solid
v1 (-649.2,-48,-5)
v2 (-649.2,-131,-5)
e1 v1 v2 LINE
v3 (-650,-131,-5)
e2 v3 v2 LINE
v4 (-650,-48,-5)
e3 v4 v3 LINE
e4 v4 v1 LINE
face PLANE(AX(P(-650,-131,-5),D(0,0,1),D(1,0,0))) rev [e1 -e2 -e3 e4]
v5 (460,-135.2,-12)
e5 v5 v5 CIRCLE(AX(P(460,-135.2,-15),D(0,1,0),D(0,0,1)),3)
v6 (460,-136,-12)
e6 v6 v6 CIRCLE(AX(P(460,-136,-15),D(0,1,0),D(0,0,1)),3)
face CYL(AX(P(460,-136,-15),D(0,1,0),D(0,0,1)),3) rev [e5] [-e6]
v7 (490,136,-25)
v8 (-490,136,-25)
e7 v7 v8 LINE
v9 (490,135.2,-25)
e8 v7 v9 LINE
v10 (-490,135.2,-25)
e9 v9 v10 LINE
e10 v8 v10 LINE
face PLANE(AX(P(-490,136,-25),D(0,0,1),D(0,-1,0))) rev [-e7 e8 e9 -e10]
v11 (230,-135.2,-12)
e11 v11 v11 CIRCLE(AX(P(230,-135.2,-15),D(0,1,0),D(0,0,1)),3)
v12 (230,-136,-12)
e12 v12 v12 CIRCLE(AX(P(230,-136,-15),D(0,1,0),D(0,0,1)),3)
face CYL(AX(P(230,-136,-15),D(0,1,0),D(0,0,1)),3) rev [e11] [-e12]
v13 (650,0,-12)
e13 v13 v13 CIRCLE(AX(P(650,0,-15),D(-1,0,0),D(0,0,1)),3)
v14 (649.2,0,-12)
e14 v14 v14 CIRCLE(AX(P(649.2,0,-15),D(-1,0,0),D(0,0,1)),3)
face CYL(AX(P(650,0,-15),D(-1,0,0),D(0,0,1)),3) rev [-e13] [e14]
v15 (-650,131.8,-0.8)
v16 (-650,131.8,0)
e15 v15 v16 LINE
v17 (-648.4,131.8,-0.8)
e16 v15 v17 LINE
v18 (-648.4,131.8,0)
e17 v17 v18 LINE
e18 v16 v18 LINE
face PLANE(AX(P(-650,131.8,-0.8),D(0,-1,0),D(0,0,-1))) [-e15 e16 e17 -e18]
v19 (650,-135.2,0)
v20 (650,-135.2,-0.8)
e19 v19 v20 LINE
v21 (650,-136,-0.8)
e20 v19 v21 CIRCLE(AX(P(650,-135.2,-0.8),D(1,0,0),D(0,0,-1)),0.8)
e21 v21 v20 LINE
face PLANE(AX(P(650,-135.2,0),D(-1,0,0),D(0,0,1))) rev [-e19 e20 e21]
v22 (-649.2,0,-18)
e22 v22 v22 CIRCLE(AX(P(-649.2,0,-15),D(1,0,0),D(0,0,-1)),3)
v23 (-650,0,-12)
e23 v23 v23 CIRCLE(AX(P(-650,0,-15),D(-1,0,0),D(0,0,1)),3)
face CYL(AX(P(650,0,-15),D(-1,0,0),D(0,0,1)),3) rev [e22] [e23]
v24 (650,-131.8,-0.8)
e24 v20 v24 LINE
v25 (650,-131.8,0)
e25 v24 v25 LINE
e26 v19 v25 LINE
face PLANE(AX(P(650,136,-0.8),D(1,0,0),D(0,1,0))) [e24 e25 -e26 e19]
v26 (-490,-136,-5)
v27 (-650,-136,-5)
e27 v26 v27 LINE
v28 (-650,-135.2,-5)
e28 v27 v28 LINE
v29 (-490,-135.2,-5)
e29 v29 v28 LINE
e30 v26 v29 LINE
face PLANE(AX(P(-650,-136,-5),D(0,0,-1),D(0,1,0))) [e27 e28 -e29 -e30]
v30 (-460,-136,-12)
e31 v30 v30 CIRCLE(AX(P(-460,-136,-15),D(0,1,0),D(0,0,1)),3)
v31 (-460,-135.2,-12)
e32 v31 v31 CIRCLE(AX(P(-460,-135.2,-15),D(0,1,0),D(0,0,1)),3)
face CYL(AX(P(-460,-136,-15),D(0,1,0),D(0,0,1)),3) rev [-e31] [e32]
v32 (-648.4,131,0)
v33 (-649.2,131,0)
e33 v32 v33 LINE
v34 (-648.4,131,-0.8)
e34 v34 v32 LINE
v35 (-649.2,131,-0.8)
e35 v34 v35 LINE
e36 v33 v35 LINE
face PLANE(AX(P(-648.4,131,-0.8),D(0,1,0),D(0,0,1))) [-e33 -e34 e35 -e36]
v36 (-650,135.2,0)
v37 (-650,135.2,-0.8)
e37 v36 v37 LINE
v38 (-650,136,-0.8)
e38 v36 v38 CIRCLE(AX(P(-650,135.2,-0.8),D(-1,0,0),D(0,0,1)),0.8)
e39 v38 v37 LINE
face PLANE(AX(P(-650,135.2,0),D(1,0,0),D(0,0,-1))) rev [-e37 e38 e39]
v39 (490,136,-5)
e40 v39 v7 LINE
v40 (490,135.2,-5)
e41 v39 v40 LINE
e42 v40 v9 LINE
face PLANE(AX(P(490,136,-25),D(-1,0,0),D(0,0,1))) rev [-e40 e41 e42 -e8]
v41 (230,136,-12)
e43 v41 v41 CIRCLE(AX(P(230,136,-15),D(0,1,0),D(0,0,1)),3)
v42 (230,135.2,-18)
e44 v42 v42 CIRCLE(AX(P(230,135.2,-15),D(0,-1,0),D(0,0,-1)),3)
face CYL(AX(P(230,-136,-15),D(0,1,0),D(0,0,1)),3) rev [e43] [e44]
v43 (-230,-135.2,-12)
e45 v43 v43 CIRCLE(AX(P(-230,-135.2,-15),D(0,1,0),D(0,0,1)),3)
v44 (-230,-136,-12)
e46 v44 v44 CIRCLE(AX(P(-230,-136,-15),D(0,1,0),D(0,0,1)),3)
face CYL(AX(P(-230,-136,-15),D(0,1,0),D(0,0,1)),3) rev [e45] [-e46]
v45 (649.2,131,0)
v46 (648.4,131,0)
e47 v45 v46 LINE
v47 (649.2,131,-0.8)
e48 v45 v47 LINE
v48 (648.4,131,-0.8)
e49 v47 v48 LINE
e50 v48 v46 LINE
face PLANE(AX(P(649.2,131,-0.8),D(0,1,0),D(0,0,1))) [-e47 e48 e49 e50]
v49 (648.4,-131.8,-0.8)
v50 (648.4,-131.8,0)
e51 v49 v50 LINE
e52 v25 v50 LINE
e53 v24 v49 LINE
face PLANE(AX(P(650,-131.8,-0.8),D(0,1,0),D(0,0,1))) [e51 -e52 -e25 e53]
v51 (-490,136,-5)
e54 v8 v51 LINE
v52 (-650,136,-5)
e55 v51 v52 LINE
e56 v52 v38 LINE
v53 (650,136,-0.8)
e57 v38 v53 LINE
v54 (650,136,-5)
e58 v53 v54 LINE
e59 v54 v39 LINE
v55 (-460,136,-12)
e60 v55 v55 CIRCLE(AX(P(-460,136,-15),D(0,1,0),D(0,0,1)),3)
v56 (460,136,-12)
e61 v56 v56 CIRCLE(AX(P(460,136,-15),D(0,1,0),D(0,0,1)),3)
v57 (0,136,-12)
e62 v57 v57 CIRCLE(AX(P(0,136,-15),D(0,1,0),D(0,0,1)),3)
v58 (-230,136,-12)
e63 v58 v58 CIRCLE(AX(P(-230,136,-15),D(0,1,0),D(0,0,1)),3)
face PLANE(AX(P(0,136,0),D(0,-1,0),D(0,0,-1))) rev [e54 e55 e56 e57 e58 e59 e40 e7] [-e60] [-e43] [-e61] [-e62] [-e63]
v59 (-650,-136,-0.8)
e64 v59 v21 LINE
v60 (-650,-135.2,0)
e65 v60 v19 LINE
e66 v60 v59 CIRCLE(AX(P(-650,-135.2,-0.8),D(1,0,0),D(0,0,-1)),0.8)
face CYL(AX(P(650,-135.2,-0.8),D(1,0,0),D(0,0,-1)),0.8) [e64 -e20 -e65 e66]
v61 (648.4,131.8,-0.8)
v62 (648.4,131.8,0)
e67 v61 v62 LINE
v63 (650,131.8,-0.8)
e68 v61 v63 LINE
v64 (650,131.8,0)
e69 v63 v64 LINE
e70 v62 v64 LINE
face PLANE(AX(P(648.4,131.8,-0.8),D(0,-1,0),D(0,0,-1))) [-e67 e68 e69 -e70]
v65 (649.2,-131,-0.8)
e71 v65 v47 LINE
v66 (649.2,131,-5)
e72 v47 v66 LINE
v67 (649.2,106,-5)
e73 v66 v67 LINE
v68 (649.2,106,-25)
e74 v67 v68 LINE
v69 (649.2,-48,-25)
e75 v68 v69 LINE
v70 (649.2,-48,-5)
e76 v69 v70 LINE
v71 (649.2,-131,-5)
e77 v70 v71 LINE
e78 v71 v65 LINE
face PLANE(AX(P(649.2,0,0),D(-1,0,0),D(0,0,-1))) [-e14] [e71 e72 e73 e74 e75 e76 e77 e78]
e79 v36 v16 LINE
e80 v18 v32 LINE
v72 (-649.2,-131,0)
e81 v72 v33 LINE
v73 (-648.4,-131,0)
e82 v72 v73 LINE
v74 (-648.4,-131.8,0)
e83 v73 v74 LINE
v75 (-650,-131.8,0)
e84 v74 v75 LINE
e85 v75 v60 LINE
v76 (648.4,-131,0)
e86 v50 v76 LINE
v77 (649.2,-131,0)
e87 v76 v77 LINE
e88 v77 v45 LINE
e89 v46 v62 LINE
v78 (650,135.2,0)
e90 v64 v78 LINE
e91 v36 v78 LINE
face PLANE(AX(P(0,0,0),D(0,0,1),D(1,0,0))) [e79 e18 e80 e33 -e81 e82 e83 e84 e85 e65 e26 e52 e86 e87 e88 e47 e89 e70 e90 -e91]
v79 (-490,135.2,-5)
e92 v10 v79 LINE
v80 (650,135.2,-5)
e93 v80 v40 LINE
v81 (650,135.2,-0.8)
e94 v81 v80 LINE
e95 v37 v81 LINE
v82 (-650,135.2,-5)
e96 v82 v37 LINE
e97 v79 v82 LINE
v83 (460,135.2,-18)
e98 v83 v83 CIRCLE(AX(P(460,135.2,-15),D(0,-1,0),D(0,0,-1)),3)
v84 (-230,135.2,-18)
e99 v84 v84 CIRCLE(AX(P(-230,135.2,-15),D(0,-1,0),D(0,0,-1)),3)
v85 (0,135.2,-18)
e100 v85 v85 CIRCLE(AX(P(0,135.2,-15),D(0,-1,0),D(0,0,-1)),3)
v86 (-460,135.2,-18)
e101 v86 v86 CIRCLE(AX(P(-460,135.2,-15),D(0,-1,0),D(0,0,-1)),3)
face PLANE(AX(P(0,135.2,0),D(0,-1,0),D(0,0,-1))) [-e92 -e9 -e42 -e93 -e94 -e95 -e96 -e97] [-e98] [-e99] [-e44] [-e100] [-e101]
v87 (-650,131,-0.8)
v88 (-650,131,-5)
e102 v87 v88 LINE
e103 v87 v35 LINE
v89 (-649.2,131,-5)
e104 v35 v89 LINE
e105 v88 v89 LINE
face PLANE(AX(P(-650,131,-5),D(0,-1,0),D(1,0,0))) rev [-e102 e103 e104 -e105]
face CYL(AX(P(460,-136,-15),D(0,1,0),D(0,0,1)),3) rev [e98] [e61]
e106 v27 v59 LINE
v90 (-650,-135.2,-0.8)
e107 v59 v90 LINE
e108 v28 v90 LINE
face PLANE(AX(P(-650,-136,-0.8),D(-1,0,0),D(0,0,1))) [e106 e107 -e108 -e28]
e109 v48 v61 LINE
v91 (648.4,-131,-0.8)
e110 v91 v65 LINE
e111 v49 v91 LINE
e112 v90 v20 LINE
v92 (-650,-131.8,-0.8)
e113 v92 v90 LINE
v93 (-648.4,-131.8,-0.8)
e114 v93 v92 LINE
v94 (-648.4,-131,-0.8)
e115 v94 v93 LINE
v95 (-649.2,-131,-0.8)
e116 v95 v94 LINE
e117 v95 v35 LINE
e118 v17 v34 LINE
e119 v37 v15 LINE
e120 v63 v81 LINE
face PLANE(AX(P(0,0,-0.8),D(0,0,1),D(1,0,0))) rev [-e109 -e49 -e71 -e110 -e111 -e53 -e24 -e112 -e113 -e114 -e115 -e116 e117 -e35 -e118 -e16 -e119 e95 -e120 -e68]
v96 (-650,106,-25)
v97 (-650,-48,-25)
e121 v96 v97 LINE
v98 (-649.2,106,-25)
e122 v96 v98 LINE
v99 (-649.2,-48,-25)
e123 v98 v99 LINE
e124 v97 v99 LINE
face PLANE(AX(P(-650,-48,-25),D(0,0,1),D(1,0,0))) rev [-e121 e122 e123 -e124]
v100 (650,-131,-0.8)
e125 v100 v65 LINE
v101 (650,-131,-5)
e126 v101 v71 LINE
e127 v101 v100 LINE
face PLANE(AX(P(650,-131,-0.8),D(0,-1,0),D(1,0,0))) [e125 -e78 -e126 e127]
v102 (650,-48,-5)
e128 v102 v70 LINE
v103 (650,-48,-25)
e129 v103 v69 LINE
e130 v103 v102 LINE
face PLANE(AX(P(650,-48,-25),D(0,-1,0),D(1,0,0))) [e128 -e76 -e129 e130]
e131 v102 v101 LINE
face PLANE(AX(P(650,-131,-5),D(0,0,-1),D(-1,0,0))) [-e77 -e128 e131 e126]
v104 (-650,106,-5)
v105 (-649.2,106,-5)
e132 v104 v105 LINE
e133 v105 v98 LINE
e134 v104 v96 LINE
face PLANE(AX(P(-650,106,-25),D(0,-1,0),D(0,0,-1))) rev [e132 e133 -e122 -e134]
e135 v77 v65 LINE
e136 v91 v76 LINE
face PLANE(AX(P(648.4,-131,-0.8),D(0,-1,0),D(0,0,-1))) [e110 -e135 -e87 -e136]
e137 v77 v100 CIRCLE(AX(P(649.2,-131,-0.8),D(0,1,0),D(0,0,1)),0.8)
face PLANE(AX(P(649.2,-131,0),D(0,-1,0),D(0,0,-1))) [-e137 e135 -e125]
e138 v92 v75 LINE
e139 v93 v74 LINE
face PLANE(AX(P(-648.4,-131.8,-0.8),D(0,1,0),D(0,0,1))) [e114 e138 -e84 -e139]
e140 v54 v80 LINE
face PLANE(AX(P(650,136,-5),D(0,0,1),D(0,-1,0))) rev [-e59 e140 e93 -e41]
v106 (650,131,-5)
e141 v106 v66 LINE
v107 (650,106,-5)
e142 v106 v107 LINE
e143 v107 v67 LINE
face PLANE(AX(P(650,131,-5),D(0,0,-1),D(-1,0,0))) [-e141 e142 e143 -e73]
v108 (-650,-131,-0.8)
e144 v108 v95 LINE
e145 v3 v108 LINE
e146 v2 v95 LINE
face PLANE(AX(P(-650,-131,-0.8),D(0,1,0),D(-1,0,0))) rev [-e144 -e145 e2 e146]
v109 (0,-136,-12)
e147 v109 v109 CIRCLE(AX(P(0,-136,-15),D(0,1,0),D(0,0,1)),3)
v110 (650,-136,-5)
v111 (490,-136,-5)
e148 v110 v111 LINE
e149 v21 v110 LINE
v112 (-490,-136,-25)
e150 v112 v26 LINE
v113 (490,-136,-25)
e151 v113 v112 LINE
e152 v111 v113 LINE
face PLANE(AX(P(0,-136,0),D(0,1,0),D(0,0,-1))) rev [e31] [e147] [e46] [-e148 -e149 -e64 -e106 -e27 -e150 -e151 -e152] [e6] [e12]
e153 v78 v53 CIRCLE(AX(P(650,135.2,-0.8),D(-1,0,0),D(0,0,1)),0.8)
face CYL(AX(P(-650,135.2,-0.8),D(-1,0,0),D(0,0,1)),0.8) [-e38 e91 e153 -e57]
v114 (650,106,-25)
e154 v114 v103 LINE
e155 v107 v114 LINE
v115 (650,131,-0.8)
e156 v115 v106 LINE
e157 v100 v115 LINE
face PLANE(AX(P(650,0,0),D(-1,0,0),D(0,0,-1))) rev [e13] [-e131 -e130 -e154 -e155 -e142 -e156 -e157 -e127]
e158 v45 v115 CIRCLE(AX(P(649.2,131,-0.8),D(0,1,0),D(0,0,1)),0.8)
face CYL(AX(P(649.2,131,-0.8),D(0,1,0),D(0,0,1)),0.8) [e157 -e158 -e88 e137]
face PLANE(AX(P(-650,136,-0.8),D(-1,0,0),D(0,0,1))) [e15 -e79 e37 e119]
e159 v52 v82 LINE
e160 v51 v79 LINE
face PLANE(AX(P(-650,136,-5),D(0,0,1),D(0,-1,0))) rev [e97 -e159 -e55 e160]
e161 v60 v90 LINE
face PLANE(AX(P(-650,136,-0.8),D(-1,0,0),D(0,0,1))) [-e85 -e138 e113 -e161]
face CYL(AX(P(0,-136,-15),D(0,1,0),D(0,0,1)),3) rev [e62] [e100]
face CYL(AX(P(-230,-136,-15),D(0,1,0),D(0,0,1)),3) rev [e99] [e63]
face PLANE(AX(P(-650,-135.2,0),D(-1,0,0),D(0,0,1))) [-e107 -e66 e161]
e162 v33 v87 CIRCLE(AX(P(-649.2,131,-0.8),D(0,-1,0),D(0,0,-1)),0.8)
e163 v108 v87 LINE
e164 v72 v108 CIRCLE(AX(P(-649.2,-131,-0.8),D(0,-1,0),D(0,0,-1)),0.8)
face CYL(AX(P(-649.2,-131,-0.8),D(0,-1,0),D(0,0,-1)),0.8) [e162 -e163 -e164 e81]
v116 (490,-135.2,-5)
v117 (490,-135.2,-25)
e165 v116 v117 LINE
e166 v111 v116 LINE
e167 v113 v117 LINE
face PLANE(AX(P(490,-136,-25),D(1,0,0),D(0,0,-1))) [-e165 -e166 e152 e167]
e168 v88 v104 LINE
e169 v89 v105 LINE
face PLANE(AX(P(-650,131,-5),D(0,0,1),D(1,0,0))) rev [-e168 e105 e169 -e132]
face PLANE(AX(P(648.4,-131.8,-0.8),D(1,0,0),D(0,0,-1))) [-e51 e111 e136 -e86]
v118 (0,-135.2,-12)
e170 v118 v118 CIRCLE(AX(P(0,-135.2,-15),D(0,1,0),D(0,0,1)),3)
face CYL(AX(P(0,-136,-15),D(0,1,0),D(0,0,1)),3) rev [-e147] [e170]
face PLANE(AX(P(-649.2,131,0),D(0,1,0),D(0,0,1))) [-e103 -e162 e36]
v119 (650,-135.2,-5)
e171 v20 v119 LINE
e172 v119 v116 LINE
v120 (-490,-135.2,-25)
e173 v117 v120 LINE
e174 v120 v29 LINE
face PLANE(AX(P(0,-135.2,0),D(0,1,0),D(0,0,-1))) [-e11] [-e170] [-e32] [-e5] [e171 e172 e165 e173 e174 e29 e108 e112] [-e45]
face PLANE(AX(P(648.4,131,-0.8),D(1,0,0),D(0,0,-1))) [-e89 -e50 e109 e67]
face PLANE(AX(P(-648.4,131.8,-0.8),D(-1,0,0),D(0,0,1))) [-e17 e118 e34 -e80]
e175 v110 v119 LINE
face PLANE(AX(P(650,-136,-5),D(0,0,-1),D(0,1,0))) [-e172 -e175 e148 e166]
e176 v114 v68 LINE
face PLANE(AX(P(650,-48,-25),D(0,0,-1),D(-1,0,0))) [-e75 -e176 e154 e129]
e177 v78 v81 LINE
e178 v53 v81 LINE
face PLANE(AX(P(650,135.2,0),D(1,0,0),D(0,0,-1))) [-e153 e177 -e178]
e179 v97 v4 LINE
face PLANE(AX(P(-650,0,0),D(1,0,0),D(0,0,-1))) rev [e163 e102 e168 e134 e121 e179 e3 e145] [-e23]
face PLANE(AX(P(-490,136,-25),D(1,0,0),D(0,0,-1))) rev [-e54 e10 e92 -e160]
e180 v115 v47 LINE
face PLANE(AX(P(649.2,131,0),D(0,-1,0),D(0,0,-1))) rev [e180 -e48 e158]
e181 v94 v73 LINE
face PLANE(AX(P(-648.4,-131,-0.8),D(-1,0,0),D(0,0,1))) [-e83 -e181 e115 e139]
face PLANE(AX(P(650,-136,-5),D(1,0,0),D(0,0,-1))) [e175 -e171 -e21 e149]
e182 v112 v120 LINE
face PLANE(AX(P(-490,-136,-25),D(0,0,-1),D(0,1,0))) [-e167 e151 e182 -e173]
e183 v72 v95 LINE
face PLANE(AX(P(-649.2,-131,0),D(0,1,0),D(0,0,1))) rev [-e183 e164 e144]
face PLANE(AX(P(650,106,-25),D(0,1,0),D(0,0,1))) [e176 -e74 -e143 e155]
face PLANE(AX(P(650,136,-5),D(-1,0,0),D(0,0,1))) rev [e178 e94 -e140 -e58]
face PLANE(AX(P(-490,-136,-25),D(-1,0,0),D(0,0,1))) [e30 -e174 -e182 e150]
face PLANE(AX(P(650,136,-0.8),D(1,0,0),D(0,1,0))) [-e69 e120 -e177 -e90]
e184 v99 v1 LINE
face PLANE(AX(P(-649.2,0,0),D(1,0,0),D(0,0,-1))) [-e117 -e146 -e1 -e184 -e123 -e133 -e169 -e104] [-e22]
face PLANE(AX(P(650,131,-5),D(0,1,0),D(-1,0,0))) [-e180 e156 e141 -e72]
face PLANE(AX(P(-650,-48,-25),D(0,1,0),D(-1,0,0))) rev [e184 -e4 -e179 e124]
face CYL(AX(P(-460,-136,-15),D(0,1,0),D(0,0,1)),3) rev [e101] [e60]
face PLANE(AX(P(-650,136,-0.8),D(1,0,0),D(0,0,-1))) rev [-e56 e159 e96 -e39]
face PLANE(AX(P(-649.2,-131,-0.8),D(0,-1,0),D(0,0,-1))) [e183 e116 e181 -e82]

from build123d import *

# Parameters (mm, degrees)
SKETCH_1_W                   = 1300
SKETCH_1_H                   = 272
SM_BASE_FLANGE_1_DEPTH       = 0.8
SM_START                     = -650
SM_EDGE_FLANGE_1_DEPTH       = 1300
SM_START_2                   = -490
SM_EDGE_FLANGE_1_2_OUTLINE_W = 0.8
SM_EDGE_FLANGE_1_2_OUTLINE_H = 24.2
SM_EDGE_FLANGE_1_2_DEPTH     = 980
SM_EDGE_FLANGE_1_3_OUTLINE_W = 0.8
SM_EDGE_FLANGE_1_3_OUTLINE_H = 4.2
SM_EDGE_FLANGE_1_3_DEPTH     = 1300
SKETCH_11_R                  = 3
CUT_EXTRUDE_1_DEPTH          = 706.059571951
SM_START_3                   = -131.8
SM_EDGE_FLANGE_2_DEPTH       = 263.6
SM_EDGE_FLANGE_2_2_DEPTH     = 0.8
SM_START_4                   = 131
SM_EDGE_FLANGE_2_3_DEPTH     = 0.8
SM_START_5                   = -48
SM_EDGE_FLANGE_2_4_OUTLINE_W = 0.8
SM_EDGE_FLANGE_2_4_OUTLINE_H = 24.2
SM_EDGE_FLANGE_2_4_DEPTH     = 154
SM_START_6                   = -131
SM_EDGE_FLANGE_2_5_OUTLINE_W = 0.8
SM_EDGE_FLANGE_2_5_OUTLINE_H = 4.2
SM_EDGE_FLANGE_2_5_DEPTH     = 262
SKETCH_15_R                  = 3
CUT_EXTRUDE_2_DEPTH          = 1308.33354581


# Read off the part's stored shape, not the designer's step: 边线-法兰1, 边线-法兰2
# Sheet-metal steps are written as plain solids
with BuildPart() as part:
    # Sketch 1 → 基体-法兰1 (new body)
    with BuildSketch(Plane.XY):
        Rectangle(SKETCH_1_W, SKETCH_1_H)
    extrude(amount=-SM_BASE_FLANGE_1_DEPTH)

    # 边线-法兰1 outline → 边线-法兰1 (cut)
    with BuildSketch(Plane.YZ.offset(SM_START)):
        with BuildLine():
            Line((136, 0), (135.2, 0))
            ThreePointArc((135.2, 0), (135.765685425, -0.234314575), (136, -0.8))
            Line((136, -0.8), (136, 0))
        make_face()
    sm_edge_flange_1 = extrude(amount=SM_EDGE_FLANGE_1_DEPTH, mode=Mode.SUBTRACT)

    # Sm Edge Flange 1 2 outline → Sm Edge Flange 1 2 (add)
    with BuildSketch(Plane.YZ.offset(SM_START_2)):
        with Locations((135.6, -12.9)):
            Rectangle(SM_EDGE_FLANGE_1_2_OUTLINE_W, SM_EDGE_FLANGE_1_2_OUTLINE_H)
    sm_edge_flange_1_2 = extrude(amount=SM_EDGE_FLANGE_1_2_DEPTH)

    # Sm Edge Flange 1 3 outline → Sm Edge Flange 1 3 (add)
    with BuildSketch(Plane.YZ.offset(SM_START)):
        with Locations((135.6, -2.9)):
            Rectangle(SM_EDGE_FLANGE_1_3_OUTLINE_W, SM_EDGE_FLANGE_1_3_OUTLINE_H)
    sm_edge_flange_1_3 = extrude(amount=SM_EDGE_FLANGE_1_3_DEPTH)

    # 镜向1: 边线-法兰1, Sm Edge Flange 1 2, Sm Edge Flange 1 3 across plane
    add(sm_edge_flange_1.mirror(Plane.ZX), mode=Mode.SUBTRACT)
    add(sm_edge_flange_1_2.mirror(Plane.ZX))
    add(sm_edge_flange_1_3.mirror(Plane.ZX))

    # 草图11 → 切除-拉伸1 (cut, through all)
    with BuildSketch(Plane(origin=(0, 136, 0), x_dir=(1, 0, 0), z_dir=(0, 1, 0))):
        with Locations(Location((0, 15, 0), (0, 0, 270))):
            Circle(SKETCH_11_R)
        with Locations(Location((230, 15, 0), (0, 0, 270))):
            Circle(SKETCH_11_R)
        with Locations(Location((460, 15, 0), (0, 0, 270))):
            Circle(SKETCH_11_R)
        with Locations(Location((-230, 15, 0), (0, 0, 270))):
            Circle(SKETCH_11_R)
        with Locations(Location((-460, 15, 0), (0, 0, 270))):
            Circle(SKETCH_11_R)
    extrude(amount=-CUT_EXTRUDE_1_DEPTH, mode=Mode.SUBTRACT)

    # 边线-法兰2 outline → 边线-法兰2 (cut)
    with BuildSketch(Plane(origin=(0, 0, 0), x_dir=(1, 0, 0), z_dir=(0, 1, 0)).offset(SM_START_3)):
        with BuildLine():
            ThreePointArc((-649.2, 0), (-649.765685425, 0.234314575), (-650, 0.8))
            Line((-650, 0.8), (-650, 0))
            Line((-650, 0), (-649.2, 0))
        make_face()
    sm_edge_flange_2 = extrude(amount=SM_EDGE_FLANGE_2_DEPTH, mode=Mode.SUBTRACT)

    # Sm Edge Flange 2 2 outline → Sm Edge Flange 2 2 (cut)
    with BuildSketch(Plane(origin=(0, 0, 0), x_dir=(1, 0, 0), z_dir=(0, 1, 0)).offset(SM_START_3)):
        with BuildLine():
            Line((-648.4, 0.8), (-650, 0.8))
            ThreePointArc((-650, 0.8), (-649.765685425, 0.234314575), (-649.2, 0))
            Line((-649.2, 0), (-648.4, 0))
            Line((-648.4, 0), (-648.4, 0.8))
        make_face()
    sm_edge_flange_2_2 = extrude(amount=SM_EDGE_FLANGE_2_2_DEPTH, mode=Mode.SUBTRACT)

    # Sm Edge Flange 2 3 outline → Sm Edge Flange 2 3 (cut)
    with BuildSketch(Plane(origin=(0, 0, 0), x_dir=(1, 0, 0), z_dir=(0, 1, 0)).offset(SM_START_4)):
        with BuildLine():
            Line((-648.4, 0.8), (-650, 0.8))
            ThreePointArc((-650, 0.8), (-649.765685425, 0.234314575), (-649.2, 0))
            Line((-649.2, 0), (-648.4, 0))
            Line((-648.4, 0), (-648.4, 0.8))
        make_face()
    sm_edge_flange_2_3 = extrude(amount=SM_EDGE_FLANGE_2_3_DEPTH, mode=Mode.SUBTRACT)

    # Sm Edge Flange 2 4 outline → Sm Edge Flange 2 4 (add)
    with BuildSketch(Plane(origin=(0, 0, 0), x_dir=(1, 0, 0), z_dir=(0, 1, 0)).offset(SM_START_5)):
        with Locations((-649.6, 12.9)):
            Rectangle(SM_EDGE_FLANGE_2_4_OUTLINE_W, SM_EDGE_FLANGE_2_4_OUTLINE_H)
    sm_edge_flange_2_4 = extrude(amount=SM_EDGE_FLANGE_2_4_DEPTH)

    # Sm Edge Flange 2 5 outline → Sm Edge Flange 2 5 (add)
    with BuildSketch(Plane(origin=(0, 0, 0), x_dir=(1, 0, 0), z_dir=(0, 1, 0)).offset(SM_START_6)):
        with Locations((-649.6, 2.9)):
            Rectangle(SM_EDGE_FLANGE_2_5_OUTLINE_W, SM_EDGE_FLANGE_2_5_OUTLINE_H)
    sm_edge_flange_2_5 = extrude(amount=SM_EDGE_FLANGE_2_5_DEPTH)

    # 镜向2: 边线-法兰2, Sm Edge Flange 2 2, Sm Edge Flange 2 3, Sm Edge Flange 2 4, Sm Edge Flange 2 5 across plane
    add(sm_edge_flange_2.mirror(Plane(origin=(0, 0, 0), x_dir=(0, 0, 1), z_dir=(1, 0, 0))), mode=Mode.SUBTRACT)
    add(sm_edge_flange_2_2.mirror(Plane(origin=(0, 0, 0), x_dir=(0, 0, 1), z_dir=(1, 0, 0))), mode=Mode.SUBTRACT)
    add(sm_edge_flange_2_3.mirror(Plane(origin=(0, 0, 0), x_dir=(0, 0, 1), z_dir=(1, 0, 0))), mode=Mode.SUBTRACT)
    add(sm_edge_flange_2_4.mirror(Plane(origin=(0, 0, 0), x_dir=(0, 0, 1), z_dir=(1, 0, 0))))
    add(sm_edge_flange_2_5.mirror(Plane(origin=(0, 0, 0), x_dir=(0, 0, 1), z_dir=(1, 0, 0))))

    # 草图15 → 切除-拉伸2 (cut, through all)
    with BuildSketch(Plane.ZY.offset(650)):
        with Locations((-15, 0)):
            Circle(SKETCH_15_R)
    extrude(amount=-CUT_EXTRUDE_2_DEPTH, mode=Mode.SUBTRACT)


solid = part.part
